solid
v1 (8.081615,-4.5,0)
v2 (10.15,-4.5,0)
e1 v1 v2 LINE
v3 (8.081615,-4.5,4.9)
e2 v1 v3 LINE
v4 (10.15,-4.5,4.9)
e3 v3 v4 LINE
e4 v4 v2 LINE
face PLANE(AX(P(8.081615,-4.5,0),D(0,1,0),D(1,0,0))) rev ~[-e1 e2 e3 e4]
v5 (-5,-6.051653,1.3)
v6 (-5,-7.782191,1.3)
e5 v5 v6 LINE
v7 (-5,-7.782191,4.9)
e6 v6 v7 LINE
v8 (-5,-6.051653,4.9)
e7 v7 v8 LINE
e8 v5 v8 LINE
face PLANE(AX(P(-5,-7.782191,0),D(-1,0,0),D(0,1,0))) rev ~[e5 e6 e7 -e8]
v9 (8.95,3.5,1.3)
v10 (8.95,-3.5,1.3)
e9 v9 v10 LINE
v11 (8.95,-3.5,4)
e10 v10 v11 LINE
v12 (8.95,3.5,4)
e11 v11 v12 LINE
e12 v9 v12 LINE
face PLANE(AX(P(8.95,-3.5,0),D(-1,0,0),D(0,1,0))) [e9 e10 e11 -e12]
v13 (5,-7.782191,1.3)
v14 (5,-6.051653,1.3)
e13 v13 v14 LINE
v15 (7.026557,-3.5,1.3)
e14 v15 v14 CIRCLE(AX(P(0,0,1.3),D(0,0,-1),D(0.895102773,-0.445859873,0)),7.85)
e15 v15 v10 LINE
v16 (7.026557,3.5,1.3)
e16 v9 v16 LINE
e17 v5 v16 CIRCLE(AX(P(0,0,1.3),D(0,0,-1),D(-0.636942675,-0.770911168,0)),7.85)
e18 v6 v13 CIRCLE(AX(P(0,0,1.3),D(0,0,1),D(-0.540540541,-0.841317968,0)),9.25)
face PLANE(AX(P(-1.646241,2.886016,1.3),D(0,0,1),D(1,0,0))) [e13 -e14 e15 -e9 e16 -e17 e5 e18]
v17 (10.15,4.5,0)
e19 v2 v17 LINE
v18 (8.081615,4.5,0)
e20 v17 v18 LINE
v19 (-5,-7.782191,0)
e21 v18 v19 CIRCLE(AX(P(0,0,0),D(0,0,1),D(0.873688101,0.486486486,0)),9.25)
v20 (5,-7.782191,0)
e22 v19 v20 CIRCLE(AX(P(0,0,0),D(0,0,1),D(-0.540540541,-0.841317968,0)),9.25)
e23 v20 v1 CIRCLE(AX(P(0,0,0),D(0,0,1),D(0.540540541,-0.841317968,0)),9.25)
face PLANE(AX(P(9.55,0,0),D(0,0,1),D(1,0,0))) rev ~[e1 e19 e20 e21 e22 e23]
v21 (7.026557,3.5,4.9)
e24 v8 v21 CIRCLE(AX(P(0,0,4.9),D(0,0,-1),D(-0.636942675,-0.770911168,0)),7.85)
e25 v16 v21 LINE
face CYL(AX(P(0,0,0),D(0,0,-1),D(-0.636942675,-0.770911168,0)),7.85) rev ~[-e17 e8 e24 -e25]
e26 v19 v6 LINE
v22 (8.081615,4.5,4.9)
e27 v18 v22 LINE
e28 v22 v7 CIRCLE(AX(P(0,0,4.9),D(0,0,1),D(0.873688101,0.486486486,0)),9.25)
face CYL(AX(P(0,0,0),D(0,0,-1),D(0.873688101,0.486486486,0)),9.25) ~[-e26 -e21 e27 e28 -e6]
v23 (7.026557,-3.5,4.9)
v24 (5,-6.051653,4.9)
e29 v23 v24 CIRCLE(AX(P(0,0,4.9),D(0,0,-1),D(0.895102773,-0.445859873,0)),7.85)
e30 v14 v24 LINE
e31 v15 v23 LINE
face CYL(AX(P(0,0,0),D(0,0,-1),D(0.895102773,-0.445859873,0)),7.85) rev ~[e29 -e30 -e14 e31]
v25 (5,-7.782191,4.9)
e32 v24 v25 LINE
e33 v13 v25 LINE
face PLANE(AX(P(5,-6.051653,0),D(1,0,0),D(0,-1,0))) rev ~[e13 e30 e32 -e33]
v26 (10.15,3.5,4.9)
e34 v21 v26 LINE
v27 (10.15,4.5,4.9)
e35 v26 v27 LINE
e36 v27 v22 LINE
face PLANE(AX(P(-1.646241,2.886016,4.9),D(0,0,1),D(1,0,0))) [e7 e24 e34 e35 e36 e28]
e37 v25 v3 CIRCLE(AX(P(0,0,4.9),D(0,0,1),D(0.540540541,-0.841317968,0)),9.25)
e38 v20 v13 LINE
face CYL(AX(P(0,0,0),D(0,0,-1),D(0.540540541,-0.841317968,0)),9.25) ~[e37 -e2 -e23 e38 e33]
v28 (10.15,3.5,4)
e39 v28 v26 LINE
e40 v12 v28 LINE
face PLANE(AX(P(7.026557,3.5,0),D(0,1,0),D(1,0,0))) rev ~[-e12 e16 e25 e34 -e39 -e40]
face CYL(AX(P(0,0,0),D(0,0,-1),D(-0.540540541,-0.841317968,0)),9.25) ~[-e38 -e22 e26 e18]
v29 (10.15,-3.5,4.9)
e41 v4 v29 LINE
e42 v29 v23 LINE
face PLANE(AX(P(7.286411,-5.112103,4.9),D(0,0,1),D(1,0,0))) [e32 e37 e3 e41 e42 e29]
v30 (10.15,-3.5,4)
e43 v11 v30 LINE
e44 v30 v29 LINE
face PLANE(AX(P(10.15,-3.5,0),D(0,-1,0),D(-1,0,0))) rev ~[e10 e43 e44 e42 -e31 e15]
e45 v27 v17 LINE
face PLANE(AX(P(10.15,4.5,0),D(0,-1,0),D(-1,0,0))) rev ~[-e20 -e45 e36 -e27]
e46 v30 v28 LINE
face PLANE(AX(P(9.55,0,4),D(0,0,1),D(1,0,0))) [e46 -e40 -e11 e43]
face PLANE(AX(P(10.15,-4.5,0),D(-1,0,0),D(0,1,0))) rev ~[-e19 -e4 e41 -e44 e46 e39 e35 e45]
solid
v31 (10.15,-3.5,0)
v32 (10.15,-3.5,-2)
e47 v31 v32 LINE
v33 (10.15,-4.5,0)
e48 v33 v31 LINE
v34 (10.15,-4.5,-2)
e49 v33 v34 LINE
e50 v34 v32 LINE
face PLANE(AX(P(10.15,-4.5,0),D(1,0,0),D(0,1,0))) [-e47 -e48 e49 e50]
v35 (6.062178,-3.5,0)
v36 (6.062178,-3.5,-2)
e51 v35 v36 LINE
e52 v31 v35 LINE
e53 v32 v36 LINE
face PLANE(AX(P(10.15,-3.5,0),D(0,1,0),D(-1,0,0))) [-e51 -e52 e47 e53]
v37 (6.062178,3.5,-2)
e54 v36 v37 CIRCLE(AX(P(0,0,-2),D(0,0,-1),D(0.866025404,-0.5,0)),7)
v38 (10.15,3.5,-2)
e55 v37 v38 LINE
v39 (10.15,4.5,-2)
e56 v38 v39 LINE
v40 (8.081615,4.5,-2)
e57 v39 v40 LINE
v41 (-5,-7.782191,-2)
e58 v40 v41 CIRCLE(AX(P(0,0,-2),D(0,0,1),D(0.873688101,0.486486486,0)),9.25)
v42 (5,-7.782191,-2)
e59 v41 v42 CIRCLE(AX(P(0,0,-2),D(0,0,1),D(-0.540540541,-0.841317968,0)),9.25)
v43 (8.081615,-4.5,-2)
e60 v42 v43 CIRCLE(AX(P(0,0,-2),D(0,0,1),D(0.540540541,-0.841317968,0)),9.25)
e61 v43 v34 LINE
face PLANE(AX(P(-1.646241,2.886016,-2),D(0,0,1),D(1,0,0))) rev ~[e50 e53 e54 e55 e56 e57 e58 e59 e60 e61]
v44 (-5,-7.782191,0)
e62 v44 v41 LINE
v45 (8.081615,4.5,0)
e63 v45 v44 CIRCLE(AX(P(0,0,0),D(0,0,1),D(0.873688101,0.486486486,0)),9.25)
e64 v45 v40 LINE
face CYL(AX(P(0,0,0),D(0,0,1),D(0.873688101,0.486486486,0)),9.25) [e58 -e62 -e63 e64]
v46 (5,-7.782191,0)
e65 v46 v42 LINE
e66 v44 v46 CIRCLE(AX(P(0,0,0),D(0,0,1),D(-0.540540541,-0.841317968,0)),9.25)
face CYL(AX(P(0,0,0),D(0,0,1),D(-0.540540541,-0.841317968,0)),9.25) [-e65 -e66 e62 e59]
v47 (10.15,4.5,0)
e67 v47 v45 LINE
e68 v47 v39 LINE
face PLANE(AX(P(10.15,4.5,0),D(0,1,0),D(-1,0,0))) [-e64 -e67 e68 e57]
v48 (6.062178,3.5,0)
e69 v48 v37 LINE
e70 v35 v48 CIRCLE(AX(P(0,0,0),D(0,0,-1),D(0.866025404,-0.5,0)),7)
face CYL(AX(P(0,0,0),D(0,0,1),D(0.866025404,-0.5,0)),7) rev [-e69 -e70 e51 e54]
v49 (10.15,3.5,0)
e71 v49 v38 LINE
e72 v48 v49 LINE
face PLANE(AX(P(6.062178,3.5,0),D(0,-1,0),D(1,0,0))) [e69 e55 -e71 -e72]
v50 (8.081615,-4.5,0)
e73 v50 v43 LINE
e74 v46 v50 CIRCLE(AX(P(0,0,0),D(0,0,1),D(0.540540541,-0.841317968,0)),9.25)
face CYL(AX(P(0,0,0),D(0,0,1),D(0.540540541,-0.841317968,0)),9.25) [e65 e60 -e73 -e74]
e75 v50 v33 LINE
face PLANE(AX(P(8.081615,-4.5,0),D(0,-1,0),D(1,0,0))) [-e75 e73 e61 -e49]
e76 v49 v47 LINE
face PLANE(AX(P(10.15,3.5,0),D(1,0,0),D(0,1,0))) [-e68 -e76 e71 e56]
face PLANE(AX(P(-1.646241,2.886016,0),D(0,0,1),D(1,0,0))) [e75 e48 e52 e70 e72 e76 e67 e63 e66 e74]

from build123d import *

# Parameters (mm, degrees)
F0_W     = 1.2
F0_H     = 7
F1_DEPTH = 1.3
F2_DEPTH = 4.9
F3_DEPTH = 4
F4_DEPTH = 2


with BuildPart() as f1:
    # F0 (on Top) → F1 (new body)
    with BuildSketch(Plane.XY):
        with BuildLine():
            ThreePointArc((-5, -6.0516526668), (-4.8821358287, 6.147133458), (7.026556767, 3.5))
            Line((7.026556767, 3.5), (8.95, 3.5))
            Line((8.95, 3.5), (10.15, 3.5))
            Line((10.15, 3.5), (10.15, 4.5))
            Line((10.15, 4.5), (8.0816149376, 4.5))
            ThreePointArc((8.0816149376, 4.5), (-6.3314408213, 6.7435418828), (-5, -7.7821912081))
            Line((-5, -7.7821912081), (-5, -6.0516526668))
        make_face()
        with BuildLine():
            ThreePointArc((5, -6.0516526668), (0, -7.85), (-5, -6.0516526668))
            Line((-5, -6.0516526668), (-5, -7.7821912081))
            ThreePointArc((-5, -7.7821912081), (0, -9.25), (5, -7.7821912081))
            Line((5, -7.7821912081), (5, -6.0516526668))
        make_face()
        with Locations((9.55, 0)):
            Rectangle(F0_W, F0_H)
        with BuildLine():
            ThreePointArc((7.026556767, -3.5), (6.147133458, -4.8821358287), (5, -6.0516526668))
            Line((5, -6.0516526668), (5, -7.7821912081))
            ThreePointArc((5, -7.7821912081), (6.7435418828, -6.3314408213), (8.0816149376, -4.5))
            Line((8.0816149376, -4.5), (10.15, -4.5))
            Line((10.15, -4.5), (10.15, -3.5))
            Line((10.15, -3.5), (8.95, -3.5))
            Line((8.95, -3.5), (7.026556767, -3.5))
        make_face()
        with BuildLine():
            Line((8.95, 3.5), (7.026556767, 3.5))
            Line((7.026556767, 3.5), (6.75, 3.5))
            Line((6.75, 3.5), (6.0621778265, 3.5))
            ThreePointArc((6.0621778265, 3.5), (6.761480784, 1.8117333157), (7, 0))
            ThreePointArc((7, 0), (6.761480784, -1.8117333157), (6.0621778265, -3.5))
            Line((6.0621778265, -3.5), (6.75, -3.5))
            Line((6.75, -3.5), (7.026556767, -3.5))
            Line((7.026556767, -3.5), (8.95, -3.5))
            Line((8.95, -3.5), (8.95, 3.5))
        make_face()
        with BuildLine():
            ThreePointArc((7, 0), (6.761480784, 1.8117333157), (6.0621778265, 3.5))
            ThreePointArc((6.0621778265, 3.5), (-7, 0), (6.0621778265, -3.5))
            ThreePointArc((6.0621778265, -3.5), (6.761480784, -1.8117333157), (7, 0))
        make_face()
        with BuildLine():
            Line((6.75, 3.5), (7.026556767, 3.5))
            ThreePointArc((7.026556767, 3.5), (-4.8821358287, 6.147133458), (-5, -6.0516526668))
            ThreePointArc((-5, -6.0516526668), (0, -7.85), (5, -6.0516526668))
            ThreePointArc((5, -6.0516526668), (6.147133458, -4.8821358287), (7.026556767, -3.5))
            Line((7.026556767, -3.5), (6.75, -3.5))
            Line((6.75, -3.5), (6.0621778265, -3.5))
            ThreePointArc((6.0621778265, -3.5), (-7, 0), (6.0621778265, 3.5))
            Line((6.0621778265, 3.5), (6.75, 3.5))
        make_face()
    extrude(amount=F1_DEPTH)

    # F0 (on Top) → F2 (join)
    with BuildSketch(Plane.XY):
        with BuildLine():
            ThreePointArc((-5, -6.0516526668), (-4.8821358287, 6.147133458), (7.026556767, 3.5))
            Line((7.026556767, 3.5), (8.95, 3.5))
            Line((8.95, 3.5), (10.15, 3.5))
            Line((10.15, 3.5), (10.15, 4.5))
            Line((10.15, 4.5), (8.0816149376, 4.5))
            ThreePointArc((8.0816149376, 4.5), (-6.3314408213, 6.7435418828), (-5, -7.7821912081))
            Line((-5, -7.7821912081), (-5, -6.0516526668))
        make_face()
        with BuildLine():
            ThreePointArc((7.026556767, -3.5), (6.147133458, -4.8821358287), (5, -6.0516526668))
            Line((5, -6.0516526668), (5, -7.7821912081))
            ThreePointArc((5, -7.7821912081), (6.7435418828, -6.3314408213), (8.0816149376, -4.5))
            Line((8.0816149376, -4.5), (10.15, -4.5))
            Line((10.15, -4.5), (10.15, -3.5))
            Line((10.15, -3.5), (8.95, -3.5))
            Line((8.95, -3.5), (7.026556767, -3.5))
        make_face()
    extrude(amount=F2_DEPTH)

    # F0 (on Top) → F3 (join)
    with BuildSketch(Plane.XY):
        with Locations((9.55, 0)):
            Rectangle(F0_W, F0_H)
    extrude(amount=F3_DEPTH)


with BuildPart() as f4:
    # F0 (on Top) → F4 (new body)
    with BuildSketch(Plane.XY):
        with BuildLine():
            ThreePointArc((-5, -6.0516526668), (-4.8821358287, 6.147133458), (7.026556767, 3.5))
            Line((7.026556767, 3.5), (8.95, 3.5))
            Line((8.95, 3.5), (10.15, 3.5))
            Line((10.15, 3.5), (10.15, 4.5))
            Line((10.15, 4.5), (8.0816149376, 4.5))
            ThreePointArc((8.0816149376, 4.5), (-6.3314408213, 6.7435418828), (-5, -7.7821912081))
            Line((-5, -7.7821912081), (-5, -6.0516526668))
        make_face()
        with BuildLine():
            ThreePointArc((5, -6.0516526668), (0, -7.85), (-5, -6.0516526668))
            Line((-5, -6.0516526668), (-5, -7.7821912081))
            ThreePointArc((-5, -7.7821912081), (0, -9.25), (5, -7.7821912081))
            Line((5, -7.7821912081), (5, -6.0516526668))
        make_face()
        with BuildLine():
            ThreePointArc((7.026556767, -3.5), (6.147133458, -4.8821358287), (5, -6.0516526668))
            Line((5, -6.0516526668), (5, -7.7821912081))
            ThreePointArc((5, -7.7821912081), (6.7435418828, -6.3314408213), (8.0816149376, -4.5))
            Line((8.0816149376, -4.5), (10.15, -4.5))
            Line((10.15, -4.5), (10.15, -3.5))
            Line((10.15, -3.5), (8.95, -3.5))
            Line((8.95, -3.5), (7.026556767, -3.5))
        make_face()
        with BuildLine():
            Line((6.75, 3.5), (7.026556767, 3.5))
            ThreePointArc((7.026556767, 3.5), (-4.8821358287, 6.147133458), (-5, -6.0516526668))
            ThreePointArc((-5, -6.0516526668), (0, -7.85), (5, -6.0516526668))
            ThreePointArc((5, -6.0516526668), (6.147133458, -4.8821358287), (7.026556767, -3.5))
            Line((7.026556767, -3.5), (6.75, -3.5))
            Line((6.75, -3.5), (6.0621778265, -3.5))
            ThreePointArc((6.0621778265, -3.5), (-7, 0), (6.0621778265, 3.5))
            Line((6.0621778265, 3.5), (6.75, 3.5))
        make_face()
    extrude(amount=-F4_DEPTH)


solid = Compound([f1.part, f4.part])
